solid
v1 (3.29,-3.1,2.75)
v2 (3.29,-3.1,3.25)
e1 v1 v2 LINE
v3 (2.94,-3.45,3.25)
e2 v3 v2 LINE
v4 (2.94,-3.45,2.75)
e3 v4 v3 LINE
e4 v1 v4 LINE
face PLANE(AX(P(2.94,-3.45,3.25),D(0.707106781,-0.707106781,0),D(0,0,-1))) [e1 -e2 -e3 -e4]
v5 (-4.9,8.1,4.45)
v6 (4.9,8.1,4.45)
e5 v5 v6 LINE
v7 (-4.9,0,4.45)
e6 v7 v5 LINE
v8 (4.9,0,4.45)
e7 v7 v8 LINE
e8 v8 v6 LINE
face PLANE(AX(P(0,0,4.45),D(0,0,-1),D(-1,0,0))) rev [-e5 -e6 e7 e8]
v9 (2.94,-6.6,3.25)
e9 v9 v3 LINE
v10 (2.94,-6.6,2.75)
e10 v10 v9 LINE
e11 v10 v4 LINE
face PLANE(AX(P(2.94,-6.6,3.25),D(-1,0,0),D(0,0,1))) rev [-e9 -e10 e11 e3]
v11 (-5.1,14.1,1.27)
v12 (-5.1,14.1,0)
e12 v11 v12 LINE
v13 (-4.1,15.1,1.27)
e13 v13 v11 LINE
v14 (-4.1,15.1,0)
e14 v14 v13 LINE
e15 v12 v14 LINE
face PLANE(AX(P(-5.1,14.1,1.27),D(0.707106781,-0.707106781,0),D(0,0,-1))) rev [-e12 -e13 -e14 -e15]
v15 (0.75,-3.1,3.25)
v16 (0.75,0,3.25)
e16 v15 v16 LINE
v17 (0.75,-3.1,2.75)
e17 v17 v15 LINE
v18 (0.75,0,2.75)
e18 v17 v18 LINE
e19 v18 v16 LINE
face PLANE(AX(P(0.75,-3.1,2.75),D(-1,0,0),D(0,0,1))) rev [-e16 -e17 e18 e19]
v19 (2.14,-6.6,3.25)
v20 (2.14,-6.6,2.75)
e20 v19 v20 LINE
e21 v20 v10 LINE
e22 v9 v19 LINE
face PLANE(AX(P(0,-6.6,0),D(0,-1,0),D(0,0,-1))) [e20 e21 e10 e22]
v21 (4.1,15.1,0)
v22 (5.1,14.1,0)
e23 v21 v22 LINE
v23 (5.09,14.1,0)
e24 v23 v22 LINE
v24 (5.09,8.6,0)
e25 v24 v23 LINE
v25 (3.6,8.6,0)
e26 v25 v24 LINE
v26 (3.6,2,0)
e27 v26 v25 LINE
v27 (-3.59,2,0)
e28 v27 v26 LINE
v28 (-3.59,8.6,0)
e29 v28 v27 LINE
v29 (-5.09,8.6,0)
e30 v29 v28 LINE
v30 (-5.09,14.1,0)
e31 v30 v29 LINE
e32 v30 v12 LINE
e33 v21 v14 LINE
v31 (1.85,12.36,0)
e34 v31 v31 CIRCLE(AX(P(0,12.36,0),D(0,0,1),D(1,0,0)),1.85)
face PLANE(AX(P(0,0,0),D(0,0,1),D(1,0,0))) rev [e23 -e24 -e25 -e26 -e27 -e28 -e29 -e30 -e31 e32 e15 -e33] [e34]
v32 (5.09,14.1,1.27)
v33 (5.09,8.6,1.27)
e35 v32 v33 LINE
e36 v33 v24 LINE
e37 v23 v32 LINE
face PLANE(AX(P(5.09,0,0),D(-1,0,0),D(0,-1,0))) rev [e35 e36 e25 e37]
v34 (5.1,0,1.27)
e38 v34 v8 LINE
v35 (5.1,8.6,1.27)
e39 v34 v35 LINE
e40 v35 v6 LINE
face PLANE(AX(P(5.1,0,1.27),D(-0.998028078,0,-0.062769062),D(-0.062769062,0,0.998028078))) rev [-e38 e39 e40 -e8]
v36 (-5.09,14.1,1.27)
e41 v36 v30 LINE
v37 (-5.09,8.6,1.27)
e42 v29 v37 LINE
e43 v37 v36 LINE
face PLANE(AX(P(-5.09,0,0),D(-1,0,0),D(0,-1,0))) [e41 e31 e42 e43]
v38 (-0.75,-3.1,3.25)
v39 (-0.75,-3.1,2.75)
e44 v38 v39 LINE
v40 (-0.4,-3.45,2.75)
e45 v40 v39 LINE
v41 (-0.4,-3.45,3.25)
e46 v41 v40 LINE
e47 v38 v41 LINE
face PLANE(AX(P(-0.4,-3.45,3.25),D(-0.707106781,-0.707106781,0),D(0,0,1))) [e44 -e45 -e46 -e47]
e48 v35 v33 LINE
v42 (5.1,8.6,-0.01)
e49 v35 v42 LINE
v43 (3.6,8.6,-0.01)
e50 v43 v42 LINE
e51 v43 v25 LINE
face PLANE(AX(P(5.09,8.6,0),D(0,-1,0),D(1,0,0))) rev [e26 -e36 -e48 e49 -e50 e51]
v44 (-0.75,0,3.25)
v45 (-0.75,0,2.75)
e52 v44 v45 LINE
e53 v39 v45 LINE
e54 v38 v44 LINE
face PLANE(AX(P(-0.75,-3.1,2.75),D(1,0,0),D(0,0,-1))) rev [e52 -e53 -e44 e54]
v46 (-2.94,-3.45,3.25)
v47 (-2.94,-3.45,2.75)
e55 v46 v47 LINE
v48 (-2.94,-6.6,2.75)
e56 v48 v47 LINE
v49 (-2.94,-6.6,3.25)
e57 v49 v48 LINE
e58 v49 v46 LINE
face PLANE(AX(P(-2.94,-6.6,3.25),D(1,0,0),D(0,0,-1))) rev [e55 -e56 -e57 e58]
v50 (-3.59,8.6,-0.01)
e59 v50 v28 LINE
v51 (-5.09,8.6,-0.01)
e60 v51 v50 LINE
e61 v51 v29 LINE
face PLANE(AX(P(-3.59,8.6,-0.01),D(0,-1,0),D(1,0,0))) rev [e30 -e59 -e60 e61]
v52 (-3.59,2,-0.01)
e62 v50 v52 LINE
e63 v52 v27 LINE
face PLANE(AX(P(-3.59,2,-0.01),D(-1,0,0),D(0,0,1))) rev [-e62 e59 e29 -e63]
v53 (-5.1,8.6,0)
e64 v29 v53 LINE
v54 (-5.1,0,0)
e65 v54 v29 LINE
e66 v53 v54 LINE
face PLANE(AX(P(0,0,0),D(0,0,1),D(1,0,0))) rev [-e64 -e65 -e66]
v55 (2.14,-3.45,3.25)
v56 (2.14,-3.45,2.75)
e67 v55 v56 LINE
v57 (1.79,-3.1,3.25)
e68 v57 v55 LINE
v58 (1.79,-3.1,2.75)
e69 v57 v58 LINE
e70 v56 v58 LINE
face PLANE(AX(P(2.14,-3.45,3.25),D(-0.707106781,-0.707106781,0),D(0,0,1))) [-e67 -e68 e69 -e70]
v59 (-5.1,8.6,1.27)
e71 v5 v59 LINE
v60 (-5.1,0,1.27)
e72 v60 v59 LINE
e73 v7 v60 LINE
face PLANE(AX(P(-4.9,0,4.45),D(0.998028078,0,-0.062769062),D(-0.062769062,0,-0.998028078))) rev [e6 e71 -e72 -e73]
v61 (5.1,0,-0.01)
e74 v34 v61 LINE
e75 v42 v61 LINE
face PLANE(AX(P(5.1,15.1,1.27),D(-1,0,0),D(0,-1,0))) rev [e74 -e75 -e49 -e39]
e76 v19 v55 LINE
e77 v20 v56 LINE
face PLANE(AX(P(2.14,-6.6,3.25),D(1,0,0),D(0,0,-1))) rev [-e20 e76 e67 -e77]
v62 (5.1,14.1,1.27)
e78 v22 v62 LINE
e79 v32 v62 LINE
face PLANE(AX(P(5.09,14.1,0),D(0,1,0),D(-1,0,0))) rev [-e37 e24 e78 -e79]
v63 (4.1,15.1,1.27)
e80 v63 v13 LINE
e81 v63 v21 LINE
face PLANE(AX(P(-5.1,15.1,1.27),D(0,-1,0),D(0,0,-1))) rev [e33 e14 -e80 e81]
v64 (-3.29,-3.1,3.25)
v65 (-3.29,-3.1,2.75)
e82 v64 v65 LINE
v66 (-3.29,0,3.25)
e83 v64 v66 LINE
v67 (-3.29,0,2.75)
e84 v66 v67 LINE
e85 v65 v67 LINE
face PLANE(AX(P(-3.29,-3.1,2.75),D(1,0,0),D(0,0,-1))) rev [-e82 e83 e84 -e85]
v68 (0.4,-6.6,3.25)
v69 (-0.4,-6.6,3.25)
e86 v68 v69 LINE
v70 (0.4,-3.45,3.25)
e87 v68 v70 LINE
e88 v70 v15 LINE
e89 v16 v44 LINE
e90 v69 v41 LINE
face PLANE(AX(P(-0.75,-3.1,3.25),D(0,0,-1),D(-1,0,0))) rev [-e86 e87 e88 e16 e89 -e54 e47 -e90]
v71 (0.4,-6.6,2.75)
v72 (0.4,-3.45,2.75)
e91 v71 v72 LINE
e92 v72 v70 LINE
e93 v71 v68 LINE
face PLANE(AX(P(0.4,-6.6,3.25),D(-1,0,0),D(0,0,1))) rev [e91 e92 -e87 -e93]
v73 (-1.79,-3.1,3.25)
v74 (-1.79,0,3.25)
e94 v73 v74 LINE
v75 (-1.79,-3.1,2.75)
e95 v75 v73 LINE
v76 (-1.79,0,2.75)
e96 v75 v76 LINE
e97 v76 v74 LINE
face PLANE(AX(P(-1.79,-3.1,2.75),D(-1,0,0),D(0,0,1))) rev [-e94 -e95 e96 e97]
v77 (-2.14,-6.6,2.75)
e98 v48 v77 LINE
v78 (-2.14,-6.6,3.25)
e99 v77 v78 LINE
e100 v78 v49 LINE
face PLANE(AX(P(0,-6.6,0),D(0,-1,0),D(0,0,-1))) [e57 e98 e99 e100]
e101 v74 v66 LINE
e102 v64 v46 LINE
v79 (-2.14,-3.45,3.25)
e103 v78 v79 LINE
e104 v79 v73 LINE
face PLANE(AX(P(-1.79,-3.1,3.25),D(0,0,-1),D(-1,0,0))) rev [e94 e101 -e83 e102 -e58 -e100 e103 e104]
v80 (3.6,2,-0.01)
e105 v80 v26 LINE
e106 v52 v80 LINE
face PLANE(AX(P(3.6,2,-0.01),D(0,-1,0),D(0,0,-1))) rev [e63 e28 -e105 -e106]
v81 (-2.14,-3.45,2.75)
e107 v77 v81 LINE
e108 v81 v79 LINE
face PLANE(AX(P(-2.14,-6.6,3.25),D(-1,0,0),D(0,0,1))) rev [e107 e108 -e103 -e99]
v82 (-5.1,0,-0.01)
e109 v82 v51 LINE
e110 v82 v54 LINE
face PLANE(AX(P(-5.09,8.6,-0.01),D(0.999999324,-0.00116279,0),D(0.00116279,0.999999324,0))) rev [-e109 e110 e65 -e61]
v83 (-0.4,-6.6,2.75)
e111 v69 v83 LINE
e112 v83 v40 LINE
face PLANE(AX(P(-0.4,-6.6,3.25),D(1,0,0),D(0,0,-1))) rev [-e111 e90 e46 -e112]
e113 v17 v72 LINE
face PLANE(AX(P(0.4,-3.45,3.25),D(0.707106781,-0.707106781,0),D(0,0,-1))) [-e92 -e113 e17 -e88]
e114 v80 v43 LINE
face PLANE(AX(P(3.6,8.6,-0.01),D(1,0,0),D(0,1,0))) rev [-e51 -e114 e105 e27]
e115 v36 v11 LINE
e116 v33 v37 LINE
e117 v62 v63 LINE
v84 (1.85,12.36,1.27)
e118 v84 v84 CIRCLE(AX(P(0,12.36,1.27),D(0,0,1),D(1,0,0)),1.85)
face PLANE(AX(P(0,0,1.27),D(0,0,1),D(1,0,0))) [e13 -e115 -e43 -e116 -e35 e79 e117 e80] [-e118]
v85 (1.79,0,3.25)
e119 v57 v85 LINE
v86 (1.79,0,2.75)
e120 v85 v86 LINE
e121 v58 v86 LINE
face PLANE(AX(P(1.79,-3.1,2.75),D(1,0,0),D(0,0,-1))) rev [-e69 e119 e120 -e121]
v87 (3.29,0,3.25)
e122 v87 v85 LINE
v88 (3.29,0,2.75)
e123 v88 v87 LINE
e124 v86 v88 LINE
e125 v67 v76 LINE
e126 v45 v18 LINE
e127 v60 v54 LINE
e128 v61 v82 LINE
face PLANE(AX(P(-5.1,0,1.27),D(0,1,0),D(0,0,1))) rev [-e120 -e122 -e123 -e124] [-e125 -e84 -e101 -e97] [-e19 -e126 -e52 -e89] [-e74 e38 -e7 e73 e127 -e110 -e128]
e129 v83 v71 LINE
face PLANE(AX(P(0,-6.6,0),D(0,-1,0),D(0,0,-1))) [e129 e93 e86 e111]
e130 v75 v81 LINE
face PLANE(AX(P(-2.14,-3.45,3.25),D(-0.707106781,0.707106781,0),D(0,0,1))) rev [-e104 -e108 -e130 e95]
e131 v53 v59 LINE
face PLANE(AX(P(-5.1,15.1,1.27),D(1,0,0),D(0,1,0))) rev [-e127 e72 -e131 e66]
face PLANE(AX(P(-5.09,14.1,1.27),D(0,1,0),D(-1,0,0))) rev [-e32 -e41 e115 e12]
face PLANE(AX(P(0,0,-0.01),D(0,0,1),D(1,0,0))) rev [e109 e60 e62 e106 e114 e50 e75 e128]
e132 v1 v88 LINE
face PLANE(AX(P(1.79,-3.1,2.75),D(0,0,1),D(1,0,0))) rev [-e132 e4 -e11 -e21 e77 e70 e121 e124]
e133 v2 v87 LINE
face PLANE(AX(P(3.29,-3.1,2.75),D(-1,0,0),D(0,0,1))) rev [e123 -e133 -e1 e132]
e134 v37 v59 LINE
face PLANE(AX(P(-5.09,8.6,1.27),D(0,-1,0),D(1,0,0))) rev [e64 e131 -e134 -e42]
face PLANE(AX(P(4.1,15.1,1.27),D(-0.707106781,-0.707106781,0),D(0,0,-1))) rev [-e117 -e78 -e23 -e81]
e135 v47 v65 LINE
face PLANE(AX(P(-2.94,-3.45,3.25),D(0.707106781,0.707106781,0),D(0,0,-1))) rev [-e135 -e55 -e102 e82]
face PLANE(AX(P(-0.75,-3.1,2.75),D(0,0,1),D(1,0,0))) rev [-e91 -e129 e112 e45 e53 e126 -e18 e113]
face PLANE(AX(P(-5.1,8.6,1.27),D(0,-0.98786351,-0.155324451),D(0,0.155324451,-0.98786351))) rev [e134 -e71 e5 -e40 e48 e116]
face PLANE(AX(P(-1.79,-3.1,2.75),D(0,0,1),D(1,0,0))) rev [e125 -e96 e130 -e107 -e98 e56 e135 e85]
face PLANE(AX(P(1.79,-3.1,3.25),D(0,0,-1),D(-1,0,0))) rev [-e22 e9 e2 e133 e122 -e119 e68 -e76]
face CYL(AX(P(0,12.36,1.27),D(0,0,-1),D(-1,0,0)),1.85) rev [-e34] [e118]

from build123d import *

# Parameters (mm, degrees)
ESQUISSE1_W             = 10.2
ESQUISSE1_H             = 15.1
ESQUISSE1_R             = 1.85
BOSS_EXTRU_1_DEPTH      = 1.27
ESQUISSE2_W             = 10.2
ESQUISSE2_H             = 8.6
BOSS_EXTRU_2_DEPTH      = 3.18
ENL_V_MAT_EXTRU_1_DEPTH = 11.944062317
ENL_V_MAT_EXTRU_2_DEPTH = 19.757731739
ESQUISSE5_W             = 1.5
ESQUISSE5_H             = 0.5
BOSS_EXTRU_3_DEPTH      = 3.1
ESQUISSE6_W             = 0.8
ESQUISSE6_H             = 0.5
BOSS_EXTRU_4_DEPTH      = 3.5
CHANFREIN1_SIZE         = 0.35
CHANFREIN2_SIZE         = 1
ESQUISSE8_W             = 1.27
ESQUISSE8_H             = 5.5
ENL_V_MAT_EXTRU_4_DEPTH = 0.01
ESQUISSE9_W             = 1.27
ESQUISSE9_H             = 5.5
ENL_V_MAT_EXTRU_5_DEPTH = 0.01
BOSS_EXTRU_6_DEPTH      = 0.01


with BuildPart() as part:
    # Esquisse1 → Boss.-Extru.1 (new body)
    with BuildSketch(Plane.XY):
        with Locations((0, 7.55)):
            Rectangle(ESQUISSE1_W, ESQUISSE1_H)
        with Locations((0, 12.36)):
            Circle(ESQUISSE1_R, mode=Mode.SUBTRACT)
    extrude(amount=BOSS_EXTRU_1_DEPTH)

    # Esquisse2 → Boss.-Extru.2 (add)
    with BuildSketch(Plane.XY.offset(1.27)):
        with Locations((0, 4.3)):
            Rectangle(ESQUISSE2_W, ESQUISSE2_H)
    extrude(amount=BOSS_EXTRU_2_DEPTH)

    # Esquisse3 → Enlèv. mat.-Extru.1 (cut, through all)
    with BuildSketch(Plane(origin=(0, 8.6, 0), x_dir=(1, 0, 0), z_dir=(0, 1, 0))):
        Polygon((5.1, -1.27), (4.9, -4.45), (5.1, -4.45), align=None)
        Polygon((-5.1, -1.27), (-5.1, -4.45), (-4.9, -4.45), align=None)
    extrude(amount=-ENL_V_MAT_EXTRU_1_DEPTH, mode=Mode.SUBTRACT)

    # Esquisse4 → Enlèv. mat.-Extru.2 (cut, through all)
    with BuildSketch(Plane(origin=(5.1, 0, 0), x_dir=(0, 0, -1), z_dir=(1, 0, 0))):
        Polygon((-1.27, 8.6), (-4.45, 8.1), (-4.45, 8.6), align=None)
    extrude(amount=-ENL_V_MAT_EXTRU_2_DEPTH, mode=Mode.SUBTRACT)

    # Esquisse5 → Boss.-Extru.3 (add)
    with BuildSketch(Plane.XZ):
        with Locations((0, 3)):
            Rectangle(ESQUISSE5_W, ESQUISSE5_H)
        with Locations((2.54, 3)):
            Rectangle(ESQUISSE5_W, ESQUISSE5_H)
        with Locations((-2.54, 3)):
            Rectangle(ESQUISSE5_W, ESQUISSE5_H)
    extrude(amount=BOSS_EXTRU_3_DEPTH)

    # Esquisse6 → Boss.-Extru.4 (add)
    with BuildSketch(Plane.XZ.offset(3.1)):
        with Locations((-2.54, 3)):
            Rectangle(ESQUISSE6_W, ESQUISSE6_H)
        with Locations((0, 3)):
            Rectangle(ESQUISSE6_W, ESQUISSE6_H)
        with Locations((2.54, 3)):
            Rectangle(ESQUISSE6_W, ESQUISSE6_H)
    extrude(amount=BOSS_EXTRU_4_DEPTH)

    # Chanfrein1
    chanfrein1_edges = [part.edges().sort_by_distance(p)[0] for p in [
        (2.94, -3.1, 3),
        (0.4, -3.1, 3),
        (-2.14, -3.1, 3),
        (2.14, -3.1, 3),
        (-0.4, -3.1, 3),
        (-2.94, -3.1, 3),
    ]]
    chamfer(chanfrein1_edges, length=CHANFREIN1_SIZE - 0.0001)  # a hair under: the kernel refuses the full size

    # Chanfrein2
    chanfrein2_edges = [part.edges().sort_by_distance(p)[0] for p in [
        (-5.1, 15.1, 0.635),
        (5.1, 15.1, 0.635),
    ]]
    chamfer(chanfrein2_edges, length=CHANFREIN2_SIZE)

    # Esquisse8 → Enlèv. mat.-Extru.4 (cut)
    with BuildSketch(Plane(origin=(5.1, 0, 0), x_dir=(0, 0, -1), z_dir=(1, 0, 0))):
        with Locations((-0.635, 11.35)):
            Rectangle(ESQUISSE8_W, ESQUISSE8_H)
    extrude(amount=-ENL_V_MAT_EXTRU_4_DEPTH, mode=Mode.SUBTRACT)

    # Esquisse9 → Enlèv. mat.-Extru.5 (cut)
    with BuildSketch(Plane.ZY.offset(5.1)):
        with Locations((0.635, 11.35)):
            Rectangle(ESQUISSE9_W, ESQUISSE9_H)
    extrude(amount=-ENL_V_MAT_EXTRU_5_DEPTH, mode=Mode.SUBTRACT)

    # Esquisse11 → Boss.-Extru.6 (add)
    with BuildSketch(Plane(origin=(0, 0, 0), x_dir=(-1, 0, 0), z_dir=(0, 0, -1))):
        Polygon((-5.1, 0), (-5.1, 8.6), (-3.6, 8.6), (-3.6, 2), (3.59, 2), (3.59, 8.6), (5.09, 8.6), (5.1, 0), align=None)
    extrude(amount=BOSS_EXTRU_6_DEPTH)


solid = part.part
